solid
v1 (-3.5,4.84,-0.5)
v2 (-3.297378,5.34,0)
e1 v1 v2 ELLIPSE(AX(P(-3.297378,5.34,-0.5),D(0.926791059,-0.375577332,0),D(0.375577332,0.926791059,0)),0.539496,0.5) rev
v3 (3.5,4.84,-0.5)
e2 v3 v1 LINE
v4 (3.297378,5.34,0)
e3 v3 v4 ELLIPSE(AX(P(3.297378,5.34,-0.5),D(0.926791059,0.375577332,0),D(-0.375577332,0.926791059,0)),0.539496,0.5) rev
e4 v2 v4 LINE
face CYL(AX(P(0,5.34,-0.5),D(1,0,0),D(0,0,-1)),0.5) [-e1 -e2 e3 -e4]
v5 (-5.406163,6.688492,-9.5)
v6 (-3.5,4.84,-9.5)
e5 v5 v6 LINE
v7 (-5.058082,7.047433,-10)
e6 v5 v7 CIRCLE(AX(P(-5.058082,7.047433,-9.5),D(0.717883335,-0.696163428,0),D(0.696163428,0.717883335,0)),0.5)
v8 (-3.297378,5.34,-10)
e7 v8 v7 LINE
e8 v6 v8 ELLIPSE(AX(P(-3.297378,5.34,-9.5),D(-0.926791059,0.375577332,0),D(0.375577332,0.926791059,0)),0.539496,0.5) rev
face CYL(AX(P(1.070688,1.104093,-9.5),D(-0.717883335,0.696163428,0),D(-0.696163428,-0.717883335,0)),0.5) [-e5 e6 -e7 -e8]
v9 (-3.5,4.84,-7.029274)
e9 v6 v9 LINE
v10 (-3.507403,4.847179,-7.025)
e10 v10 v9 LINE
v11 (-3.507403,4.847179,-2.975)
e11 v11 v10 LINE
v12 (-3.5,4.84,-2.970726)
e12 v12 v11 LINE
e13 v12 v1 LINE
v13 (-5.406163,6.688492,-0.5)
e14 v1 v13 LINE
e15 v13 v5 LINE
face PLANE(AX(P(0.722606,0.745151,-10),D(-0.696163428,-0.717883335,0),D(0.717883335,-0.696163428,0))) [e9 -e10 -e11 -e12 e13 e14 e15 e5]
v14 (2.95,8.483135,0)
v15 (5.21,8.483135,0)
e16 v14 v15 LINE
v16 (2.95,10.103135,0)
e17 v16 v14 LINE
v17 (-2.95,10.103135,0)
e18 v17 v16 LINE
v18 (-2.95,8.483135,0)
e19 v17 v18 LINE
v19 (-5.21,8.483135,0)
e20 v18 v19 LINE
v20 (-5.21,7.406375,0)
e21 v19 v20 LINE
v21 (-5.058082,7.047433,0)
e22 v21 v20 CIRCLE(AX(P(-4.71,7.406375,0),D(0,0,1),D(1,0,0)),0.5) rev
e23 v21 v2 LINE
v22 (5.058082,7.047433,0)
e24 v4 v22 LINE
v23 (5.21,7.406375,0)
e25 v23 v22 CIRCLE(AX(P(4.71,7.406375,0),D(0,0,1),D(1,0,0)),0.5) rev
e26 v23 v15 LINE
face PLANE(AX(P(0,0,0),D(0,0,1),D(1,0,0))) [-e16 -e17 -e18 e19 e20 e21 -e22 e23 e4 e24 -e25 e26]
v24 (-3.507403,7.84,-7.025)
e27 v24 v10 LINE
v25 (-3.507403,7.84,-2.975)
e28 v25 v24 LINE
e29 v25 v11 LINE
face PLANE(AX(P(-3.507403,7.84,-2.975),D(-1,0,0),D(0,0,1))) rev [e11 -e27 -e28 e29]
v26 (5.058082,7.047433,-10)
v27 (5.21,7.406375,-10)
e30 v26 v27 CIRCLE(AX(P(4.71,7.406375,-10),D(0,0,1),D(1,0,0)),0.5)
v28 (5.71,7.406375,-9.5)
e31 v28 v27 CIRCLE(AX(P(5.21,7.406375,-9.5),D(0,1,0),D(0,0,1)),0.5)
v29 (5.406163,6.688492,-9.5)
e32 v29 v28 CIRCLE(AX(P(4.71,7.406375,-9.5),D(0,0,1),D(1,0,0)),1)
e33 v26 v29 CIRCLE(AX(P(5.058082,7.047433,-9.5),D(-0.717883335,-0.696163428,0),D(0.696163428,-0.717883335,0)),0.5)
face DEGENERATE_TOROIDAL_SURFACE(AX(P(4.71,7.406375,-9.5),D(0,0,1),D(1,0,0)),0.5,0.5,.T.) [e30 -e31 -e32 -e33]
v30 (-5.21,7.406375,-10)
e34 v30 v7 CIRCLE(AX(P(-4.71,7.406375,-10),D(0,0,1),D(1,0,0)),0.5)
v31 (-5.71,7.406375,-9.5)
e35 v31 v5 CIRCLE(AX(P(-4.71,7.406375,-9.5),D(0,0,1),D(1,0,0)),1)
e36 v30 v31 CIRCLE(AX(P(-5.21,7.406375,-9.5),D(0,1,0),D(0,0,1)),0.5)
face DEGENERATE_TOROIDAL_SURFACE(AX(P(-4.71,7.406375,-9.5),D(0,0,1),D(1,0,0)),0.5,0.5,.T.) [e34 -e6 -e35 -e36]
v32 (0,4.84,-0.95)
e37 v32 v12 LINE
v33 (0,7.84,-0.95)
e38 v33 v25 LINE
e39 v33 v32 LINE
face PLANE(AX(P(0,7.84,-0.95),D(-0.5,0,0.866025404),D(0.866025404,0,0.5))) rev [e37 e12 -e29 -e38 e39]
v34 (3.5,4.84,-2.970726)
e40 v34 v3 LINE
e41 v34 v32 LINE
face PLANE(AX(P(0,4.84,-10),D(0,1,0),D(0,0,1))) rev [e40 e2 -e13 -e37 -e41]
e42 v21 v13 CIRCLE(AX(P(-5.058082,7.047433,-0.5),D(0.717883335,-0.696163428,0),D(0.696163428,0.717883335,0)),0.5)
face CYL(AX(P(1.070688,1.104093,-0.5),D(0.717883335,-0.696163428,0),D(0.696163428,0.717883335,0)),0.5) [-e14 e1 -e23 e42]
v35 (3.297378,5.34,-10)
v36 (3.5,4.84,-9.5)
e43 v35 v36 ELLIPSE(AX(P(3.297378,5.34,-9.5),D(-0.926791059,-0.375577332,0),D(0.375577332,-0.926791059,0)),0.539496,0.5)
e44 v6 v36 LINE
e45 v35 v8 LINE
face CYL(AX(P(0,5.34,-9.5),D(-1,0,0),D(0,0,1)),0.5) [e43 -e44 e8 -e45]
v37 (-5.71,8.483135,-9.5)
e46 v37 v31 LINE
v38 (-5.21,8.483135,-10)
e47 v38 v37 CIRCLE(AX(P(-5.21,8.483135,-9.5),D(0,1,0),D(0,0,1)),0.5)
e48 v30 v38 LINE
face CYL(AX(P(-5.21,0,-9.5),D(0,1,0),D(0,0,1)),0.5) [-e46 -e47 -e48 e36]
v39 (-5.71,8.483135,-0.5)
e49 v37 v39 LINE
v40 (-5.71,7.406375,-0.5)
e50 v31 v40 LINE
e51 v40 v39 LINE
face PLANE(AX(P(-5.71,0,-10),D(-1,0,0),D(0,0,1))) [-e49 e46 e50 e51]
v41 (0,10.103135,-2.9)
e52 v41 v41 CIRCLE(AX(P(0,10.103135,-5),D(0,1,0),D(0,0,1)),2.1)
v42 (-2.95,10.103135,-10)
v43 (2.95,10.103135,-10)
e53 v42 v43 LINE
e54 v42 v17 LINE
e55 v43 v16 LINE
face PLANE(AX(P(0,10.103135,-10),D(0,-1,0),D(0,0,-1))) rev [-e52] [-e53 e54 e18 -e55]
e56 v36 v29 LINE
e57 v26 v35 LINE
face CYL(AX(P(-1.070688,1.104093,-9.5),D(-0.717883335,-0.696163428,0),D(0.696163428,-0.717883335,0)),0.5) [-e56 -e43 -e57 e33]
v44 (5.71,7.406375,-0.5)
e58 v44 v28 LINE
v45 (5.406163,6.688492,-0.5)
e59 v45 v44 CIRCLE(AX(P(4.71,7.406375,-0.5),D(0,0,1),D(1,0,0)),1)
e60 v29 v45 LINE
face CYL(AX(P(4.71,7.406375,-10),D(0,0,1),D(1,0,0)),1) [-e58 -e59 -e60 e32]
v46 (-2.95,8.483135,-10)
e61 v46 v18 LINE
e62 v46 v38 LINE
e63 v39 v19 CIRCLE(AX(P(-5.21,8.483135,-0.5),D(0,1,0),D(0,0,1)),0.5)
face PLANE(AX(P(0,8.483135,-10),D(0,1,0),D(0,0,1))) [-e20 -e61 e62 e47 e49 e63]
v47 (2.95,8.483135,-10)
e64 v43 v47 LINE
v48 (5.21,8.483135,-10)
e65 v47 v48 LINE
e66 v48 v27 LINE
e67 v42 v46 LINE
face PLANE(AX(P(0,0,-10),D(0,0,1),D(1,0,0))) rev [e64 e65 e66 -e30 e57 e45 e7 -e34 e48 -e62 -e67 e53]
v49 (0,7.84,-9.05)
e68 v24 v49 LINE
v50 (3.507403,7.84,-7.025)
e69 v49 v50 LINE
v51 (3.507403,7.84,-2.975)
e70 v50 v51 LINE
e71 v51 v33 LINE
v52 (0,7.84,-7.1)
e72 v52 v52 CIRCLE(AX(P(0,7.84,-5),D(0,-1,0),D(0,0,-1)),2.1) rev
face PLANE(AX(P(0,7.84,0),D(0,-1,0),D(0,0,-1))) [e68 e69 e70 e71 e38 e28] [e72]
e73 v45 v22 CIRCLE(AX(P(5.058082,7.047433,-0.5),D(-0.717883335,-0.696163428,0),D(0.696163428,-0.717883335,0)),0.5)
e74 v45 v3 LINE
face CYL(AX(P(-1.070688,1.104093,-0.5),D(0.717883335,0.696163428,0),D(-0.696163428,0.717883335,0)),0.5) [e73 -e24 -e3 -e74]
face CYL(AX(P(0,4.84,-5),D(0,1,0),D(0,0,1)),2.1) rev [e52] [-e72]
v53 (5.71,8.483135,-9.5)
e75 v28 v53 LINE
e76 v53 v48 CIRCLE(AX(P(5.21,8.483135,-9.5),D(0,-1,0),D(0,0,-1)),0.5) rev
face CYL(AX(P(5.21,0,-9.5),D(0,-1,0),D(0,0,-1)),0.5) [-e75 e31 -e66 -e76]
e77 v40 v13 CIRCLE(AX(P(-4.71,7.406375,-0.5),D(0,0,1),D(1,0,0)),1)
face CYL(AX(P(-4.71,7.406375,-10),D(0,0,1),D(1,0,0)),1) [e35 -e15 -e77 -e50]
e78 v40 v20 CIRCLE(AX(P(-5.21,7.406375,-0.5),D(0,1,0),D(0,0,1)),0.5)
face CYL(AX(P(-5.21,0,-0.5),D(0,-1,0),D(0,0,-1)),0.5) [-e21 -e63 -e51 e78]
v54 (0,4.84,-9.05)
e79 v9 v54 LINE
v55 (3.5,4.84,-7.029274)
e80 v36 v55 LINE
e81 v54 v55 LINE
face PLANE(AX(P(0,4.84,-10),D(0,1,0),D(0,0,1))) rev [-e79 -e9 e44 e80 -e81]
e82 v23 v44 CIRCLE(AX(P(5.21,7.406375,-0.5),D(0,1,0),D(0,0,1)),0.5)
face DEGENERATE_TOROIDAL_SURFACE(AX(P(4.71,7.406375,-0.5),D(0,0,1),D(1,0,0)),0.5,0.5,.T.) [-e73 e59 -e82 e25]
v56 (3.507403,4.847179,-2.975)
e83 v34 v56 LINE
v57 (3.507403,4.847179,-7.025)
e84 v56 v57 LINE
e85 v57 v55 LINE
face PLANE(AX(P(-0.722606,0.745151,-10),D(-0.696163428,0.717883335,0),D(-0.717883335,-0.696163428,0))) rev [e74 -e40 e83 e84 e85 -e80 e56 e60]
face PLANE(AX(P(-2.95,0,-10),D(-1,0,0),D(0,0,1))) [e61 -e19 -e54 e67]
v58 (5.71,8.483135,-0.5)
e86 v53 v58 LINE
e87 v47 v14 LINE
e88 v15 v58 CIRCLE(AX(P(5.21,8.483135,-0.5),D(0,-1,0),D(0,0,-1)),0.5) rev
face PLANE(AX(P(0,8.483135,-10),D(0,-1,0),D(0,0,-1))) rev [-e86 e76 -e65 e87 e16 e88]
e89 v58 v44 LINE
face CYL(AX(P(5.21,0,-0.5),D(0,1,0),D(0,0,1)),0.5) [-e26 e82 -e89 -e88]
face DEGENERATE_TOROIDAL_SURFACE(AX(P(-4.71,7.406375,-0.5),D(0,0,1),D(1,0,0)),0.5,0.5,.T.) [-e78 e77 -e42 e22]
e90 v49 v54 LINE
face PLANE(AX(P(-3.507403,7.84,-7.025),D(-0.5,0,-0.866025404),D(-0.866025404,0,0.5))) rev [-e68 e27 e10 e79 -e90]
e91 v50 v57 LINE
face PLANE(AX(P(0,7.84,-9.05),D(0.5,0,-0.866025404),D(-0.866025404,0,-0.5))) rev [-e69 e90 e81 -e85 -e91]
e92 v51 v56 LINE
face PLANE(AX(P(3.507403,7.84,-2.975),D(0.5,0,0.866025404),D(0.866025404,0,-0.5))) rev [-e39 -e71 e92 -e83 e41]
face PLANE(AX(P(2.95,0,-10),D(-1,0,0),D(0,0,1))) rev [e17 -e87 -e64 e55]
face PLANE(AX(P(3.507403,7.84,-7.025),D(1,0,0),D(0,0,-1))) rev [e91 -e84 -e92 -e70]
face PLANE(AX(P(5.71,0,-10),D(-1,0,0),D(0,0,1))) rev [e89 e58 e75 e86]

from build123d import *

# Parameters (mm, degrees)
BOSS_EXTRU_1_DEPTH      = 10
CONG_1_R                = 0.5
CONG_2_R                = 1
ESQUISSE2_R             = 2.1
ENL_V_MAT_EXTRU_1_DEPTH = 13.661149081102538
ENL_V_MAT_EXTRU_2_DEPTH = 3


with BuildPart() as part:
    # Esquisse1 → Boss.-Extru.1 (new body)
    with BuildSketch(Plane.XY):
        Polygon((-1.176e-14, 10.103135382441117), (-2.578e-14, 4.840000000000001), (3.5, 4.840000000000001), (5.71, 6.983135382441116), (5.71, 8.483135382441116), (2.95, 8.483135382441116), (2.95, 10.103135382441117), align=None)
        Polygon((-3.5, 4.840000000000001), (-2.576e-14, 4.840000000000001), (-1.176e-14, 10.103135382441117), (-2.95, 10.103135382441117), (-2.95, 8.483135382441116), (-5.71, 8.483135382441116), (-5.71, 6.983135382441116), align=None)
    extrude(amount=-BOSS_EXTRU_1_DEPTH)

    # Congé1
    cong_1_edges = [part.edges().sort_by_distance(p)[0] for p in [
        (5.71, 7.733135382441116, 0),
        (4.605, 5.911567691220558, 0),
        (0, 4.840000000000001, 0),
        (-4.605, 5.911567691220558, 0),
        (-5.71, 7.733135382441116, 0),
        (-5.71, 7.733135382441116, -10),
        (-4.605, 5.911567691220558, -10),
        (0, 4.840000000000001, -10),
        (4.605, 5.911567691220558, -10),
        (5.71, 7.733135382441116, -10),
    ]]
    fillet(cong_1_edges, radius=CONG_1_R)

    # Congé2
    # the kernel refuses this fillet: 1 mm, written as the material it takes off along each edge
    with BuildSketch(Plane(origin=(4.71, 7.4063748668930085, -10), x_dir=(1, 0, 0), z_dir=(0, 1, 0))) as cong_2_piece_1:
        with BuildLine():
            CenterArc((0.5, -0.5), 0.5, 0, 90)
            Line((1, -0.5), (1, 0))
            Line((1, 0), (0.5, 0))
        make_face()
    revolve(axis=Axis((4.71, 7.4063748668930085, -10), (0, 0, -1)), revolution_arc=45.87999999999987, mode=Mode.SUBTRACT)
    with BuildSketch(Plane(origin=(-4.710000000000001, 7.40637486689301, -10), x_dir=(-0.6961634275566162, -0.717883334625219, 0), z_dir=(0.717883334625219, -0.6961634275566162, 0))) as cong_2_piece_2:
        with BuildLine():
            CenterArc((0.5, -0.5), 0.5, 0, 90)
            Line((1, -0.5), (1, 0))
            Line((1, 0), (0.5, 0))
        make_face()
    revolve(axis=Axis((-4.710000000000001, 7.40637486689301, -10), (0, 0, -1)), revolution_arc=45.87999999999987, mode=Mode.SUBTRACT)
    with BuildSketch(Plane(origin=(4.71, 7.4063748668930085, 0), x_dir=(0.6961634275566162, -0.717883334625219, 0), z_dir=(-0.717883334625219, -0.6961634275566162, 0))) as cong_2_piece_3:
        with BuildLine():
            CenterArc((0.5, -0.5), 0.5, 0, 90)
            Line((1, -0.5), (1, 0))
            Line((1, 0), (0.5, 0))
        make_face()
    revolve(axis=Axis((4.71, 7.4063748668930085, 0), (0, 0, 1)), revolution_arc=45.87999999999987, mode=Mode.SUBTRACT)
    with BuildSketch(Plane(origin=(-4.710000000000001, 7.40637486689301, 0), x_dir=(-1, 0, 0), z_dir=(0, 1, 0))) as cong_2_piece_4:
        with BuildLine():
            CenterArc((0.5, -0.5), 0.5, 0, 90)
            Line((1, -0.5), (1, 0))
            Line((1, 0), (0.5, 0))
        make_face()
    revolve(axis=Axis((-4.710000000000001, 7.40637486689301, 0), (0, 0, 1)), revolution_arc=45.87999999999987, mode=Mode.SUBTRACT)
    with BuildSketch(Plane(origin=(-5.71, 6.983135382441116, 1.1e-16), x_dir=(0.717883334625219, -0.6961634275566161, 0), z_dir=(0, 0, -1))) as cong_2_piece_5:
        with BuildLine():
            CenterArc((CONG_2_R * 0.423239484452, -CONG_2_R), CONG_2_R, 90.00000000000003, 45.879999999999825)
            Line((-CONG_2_R * 0.294643850173, -CONG_2_R * 0.303836572443), (0, 0))
            Line((0, 0), (CONG_2_R * 0.423239484452, 0))
        make_face()
    extrude(amount=10, mode=Mode.SUBTRACT)
    with BuildSketch(Plane(origin=(5.71, 6.983135382441116, 1.1e-16), x_dir=(-0.7178833346252179, -0.6961634275566172, 0), z_dir=(0, 0, -1))) as cong_2_piece_6:
        with BuildLine():
            CenterArc((CONG_2_R * 0.423239484452, CONG_2_R), CONG_2_R, 224.12000000000015, 45.87999999999994)
            Line((-CONG_2_R * 0.294643850173, CONG_2_R * 0.303836572443), (0, 0))
            Line((0, 0), (CONG_2_R * 0.423239484452, 2e-17))
        make_face()
    extrude(amount=10, mode=Mode.SUBTRACT)

    # Esquisse2 → Enlèv. mat.-Extru.1 (cut, through all)
    with BuildSketch(Plane(origin=(0, 10.103135382441117, 0), x_dir=(1, 0, 0), z_dir=(0, 1, 0))):
        with Locations(Location((0, 5, 0), (0, 0, 270))):
            Circle(ESQUISSE2_R)
    extrude(amount=-ENL_V_MAT_EXTRU_1_DEPTH, mode=Mode.SUBTRACT)

    # Esquisse3 → Enlèv. mat.-Extru.2 (cut)
    with BuildSketch(Plane.XZ.offset(-4.840000000000001)):
        Polygon((0, -9.05), (3.5074028853269765, -7.025), (3.5074028853269774, -2.975), (5e-16, -0.9499999999999995), (-3.5074028853269774, -2.975), (-3.5074028853269774, -7.025000000000001), align=None)
    extrude(amount=-ENL_V_MAT_EXTRU_2_DEPTH, mode=Mode.SUBTRACT)


solid = part.part
